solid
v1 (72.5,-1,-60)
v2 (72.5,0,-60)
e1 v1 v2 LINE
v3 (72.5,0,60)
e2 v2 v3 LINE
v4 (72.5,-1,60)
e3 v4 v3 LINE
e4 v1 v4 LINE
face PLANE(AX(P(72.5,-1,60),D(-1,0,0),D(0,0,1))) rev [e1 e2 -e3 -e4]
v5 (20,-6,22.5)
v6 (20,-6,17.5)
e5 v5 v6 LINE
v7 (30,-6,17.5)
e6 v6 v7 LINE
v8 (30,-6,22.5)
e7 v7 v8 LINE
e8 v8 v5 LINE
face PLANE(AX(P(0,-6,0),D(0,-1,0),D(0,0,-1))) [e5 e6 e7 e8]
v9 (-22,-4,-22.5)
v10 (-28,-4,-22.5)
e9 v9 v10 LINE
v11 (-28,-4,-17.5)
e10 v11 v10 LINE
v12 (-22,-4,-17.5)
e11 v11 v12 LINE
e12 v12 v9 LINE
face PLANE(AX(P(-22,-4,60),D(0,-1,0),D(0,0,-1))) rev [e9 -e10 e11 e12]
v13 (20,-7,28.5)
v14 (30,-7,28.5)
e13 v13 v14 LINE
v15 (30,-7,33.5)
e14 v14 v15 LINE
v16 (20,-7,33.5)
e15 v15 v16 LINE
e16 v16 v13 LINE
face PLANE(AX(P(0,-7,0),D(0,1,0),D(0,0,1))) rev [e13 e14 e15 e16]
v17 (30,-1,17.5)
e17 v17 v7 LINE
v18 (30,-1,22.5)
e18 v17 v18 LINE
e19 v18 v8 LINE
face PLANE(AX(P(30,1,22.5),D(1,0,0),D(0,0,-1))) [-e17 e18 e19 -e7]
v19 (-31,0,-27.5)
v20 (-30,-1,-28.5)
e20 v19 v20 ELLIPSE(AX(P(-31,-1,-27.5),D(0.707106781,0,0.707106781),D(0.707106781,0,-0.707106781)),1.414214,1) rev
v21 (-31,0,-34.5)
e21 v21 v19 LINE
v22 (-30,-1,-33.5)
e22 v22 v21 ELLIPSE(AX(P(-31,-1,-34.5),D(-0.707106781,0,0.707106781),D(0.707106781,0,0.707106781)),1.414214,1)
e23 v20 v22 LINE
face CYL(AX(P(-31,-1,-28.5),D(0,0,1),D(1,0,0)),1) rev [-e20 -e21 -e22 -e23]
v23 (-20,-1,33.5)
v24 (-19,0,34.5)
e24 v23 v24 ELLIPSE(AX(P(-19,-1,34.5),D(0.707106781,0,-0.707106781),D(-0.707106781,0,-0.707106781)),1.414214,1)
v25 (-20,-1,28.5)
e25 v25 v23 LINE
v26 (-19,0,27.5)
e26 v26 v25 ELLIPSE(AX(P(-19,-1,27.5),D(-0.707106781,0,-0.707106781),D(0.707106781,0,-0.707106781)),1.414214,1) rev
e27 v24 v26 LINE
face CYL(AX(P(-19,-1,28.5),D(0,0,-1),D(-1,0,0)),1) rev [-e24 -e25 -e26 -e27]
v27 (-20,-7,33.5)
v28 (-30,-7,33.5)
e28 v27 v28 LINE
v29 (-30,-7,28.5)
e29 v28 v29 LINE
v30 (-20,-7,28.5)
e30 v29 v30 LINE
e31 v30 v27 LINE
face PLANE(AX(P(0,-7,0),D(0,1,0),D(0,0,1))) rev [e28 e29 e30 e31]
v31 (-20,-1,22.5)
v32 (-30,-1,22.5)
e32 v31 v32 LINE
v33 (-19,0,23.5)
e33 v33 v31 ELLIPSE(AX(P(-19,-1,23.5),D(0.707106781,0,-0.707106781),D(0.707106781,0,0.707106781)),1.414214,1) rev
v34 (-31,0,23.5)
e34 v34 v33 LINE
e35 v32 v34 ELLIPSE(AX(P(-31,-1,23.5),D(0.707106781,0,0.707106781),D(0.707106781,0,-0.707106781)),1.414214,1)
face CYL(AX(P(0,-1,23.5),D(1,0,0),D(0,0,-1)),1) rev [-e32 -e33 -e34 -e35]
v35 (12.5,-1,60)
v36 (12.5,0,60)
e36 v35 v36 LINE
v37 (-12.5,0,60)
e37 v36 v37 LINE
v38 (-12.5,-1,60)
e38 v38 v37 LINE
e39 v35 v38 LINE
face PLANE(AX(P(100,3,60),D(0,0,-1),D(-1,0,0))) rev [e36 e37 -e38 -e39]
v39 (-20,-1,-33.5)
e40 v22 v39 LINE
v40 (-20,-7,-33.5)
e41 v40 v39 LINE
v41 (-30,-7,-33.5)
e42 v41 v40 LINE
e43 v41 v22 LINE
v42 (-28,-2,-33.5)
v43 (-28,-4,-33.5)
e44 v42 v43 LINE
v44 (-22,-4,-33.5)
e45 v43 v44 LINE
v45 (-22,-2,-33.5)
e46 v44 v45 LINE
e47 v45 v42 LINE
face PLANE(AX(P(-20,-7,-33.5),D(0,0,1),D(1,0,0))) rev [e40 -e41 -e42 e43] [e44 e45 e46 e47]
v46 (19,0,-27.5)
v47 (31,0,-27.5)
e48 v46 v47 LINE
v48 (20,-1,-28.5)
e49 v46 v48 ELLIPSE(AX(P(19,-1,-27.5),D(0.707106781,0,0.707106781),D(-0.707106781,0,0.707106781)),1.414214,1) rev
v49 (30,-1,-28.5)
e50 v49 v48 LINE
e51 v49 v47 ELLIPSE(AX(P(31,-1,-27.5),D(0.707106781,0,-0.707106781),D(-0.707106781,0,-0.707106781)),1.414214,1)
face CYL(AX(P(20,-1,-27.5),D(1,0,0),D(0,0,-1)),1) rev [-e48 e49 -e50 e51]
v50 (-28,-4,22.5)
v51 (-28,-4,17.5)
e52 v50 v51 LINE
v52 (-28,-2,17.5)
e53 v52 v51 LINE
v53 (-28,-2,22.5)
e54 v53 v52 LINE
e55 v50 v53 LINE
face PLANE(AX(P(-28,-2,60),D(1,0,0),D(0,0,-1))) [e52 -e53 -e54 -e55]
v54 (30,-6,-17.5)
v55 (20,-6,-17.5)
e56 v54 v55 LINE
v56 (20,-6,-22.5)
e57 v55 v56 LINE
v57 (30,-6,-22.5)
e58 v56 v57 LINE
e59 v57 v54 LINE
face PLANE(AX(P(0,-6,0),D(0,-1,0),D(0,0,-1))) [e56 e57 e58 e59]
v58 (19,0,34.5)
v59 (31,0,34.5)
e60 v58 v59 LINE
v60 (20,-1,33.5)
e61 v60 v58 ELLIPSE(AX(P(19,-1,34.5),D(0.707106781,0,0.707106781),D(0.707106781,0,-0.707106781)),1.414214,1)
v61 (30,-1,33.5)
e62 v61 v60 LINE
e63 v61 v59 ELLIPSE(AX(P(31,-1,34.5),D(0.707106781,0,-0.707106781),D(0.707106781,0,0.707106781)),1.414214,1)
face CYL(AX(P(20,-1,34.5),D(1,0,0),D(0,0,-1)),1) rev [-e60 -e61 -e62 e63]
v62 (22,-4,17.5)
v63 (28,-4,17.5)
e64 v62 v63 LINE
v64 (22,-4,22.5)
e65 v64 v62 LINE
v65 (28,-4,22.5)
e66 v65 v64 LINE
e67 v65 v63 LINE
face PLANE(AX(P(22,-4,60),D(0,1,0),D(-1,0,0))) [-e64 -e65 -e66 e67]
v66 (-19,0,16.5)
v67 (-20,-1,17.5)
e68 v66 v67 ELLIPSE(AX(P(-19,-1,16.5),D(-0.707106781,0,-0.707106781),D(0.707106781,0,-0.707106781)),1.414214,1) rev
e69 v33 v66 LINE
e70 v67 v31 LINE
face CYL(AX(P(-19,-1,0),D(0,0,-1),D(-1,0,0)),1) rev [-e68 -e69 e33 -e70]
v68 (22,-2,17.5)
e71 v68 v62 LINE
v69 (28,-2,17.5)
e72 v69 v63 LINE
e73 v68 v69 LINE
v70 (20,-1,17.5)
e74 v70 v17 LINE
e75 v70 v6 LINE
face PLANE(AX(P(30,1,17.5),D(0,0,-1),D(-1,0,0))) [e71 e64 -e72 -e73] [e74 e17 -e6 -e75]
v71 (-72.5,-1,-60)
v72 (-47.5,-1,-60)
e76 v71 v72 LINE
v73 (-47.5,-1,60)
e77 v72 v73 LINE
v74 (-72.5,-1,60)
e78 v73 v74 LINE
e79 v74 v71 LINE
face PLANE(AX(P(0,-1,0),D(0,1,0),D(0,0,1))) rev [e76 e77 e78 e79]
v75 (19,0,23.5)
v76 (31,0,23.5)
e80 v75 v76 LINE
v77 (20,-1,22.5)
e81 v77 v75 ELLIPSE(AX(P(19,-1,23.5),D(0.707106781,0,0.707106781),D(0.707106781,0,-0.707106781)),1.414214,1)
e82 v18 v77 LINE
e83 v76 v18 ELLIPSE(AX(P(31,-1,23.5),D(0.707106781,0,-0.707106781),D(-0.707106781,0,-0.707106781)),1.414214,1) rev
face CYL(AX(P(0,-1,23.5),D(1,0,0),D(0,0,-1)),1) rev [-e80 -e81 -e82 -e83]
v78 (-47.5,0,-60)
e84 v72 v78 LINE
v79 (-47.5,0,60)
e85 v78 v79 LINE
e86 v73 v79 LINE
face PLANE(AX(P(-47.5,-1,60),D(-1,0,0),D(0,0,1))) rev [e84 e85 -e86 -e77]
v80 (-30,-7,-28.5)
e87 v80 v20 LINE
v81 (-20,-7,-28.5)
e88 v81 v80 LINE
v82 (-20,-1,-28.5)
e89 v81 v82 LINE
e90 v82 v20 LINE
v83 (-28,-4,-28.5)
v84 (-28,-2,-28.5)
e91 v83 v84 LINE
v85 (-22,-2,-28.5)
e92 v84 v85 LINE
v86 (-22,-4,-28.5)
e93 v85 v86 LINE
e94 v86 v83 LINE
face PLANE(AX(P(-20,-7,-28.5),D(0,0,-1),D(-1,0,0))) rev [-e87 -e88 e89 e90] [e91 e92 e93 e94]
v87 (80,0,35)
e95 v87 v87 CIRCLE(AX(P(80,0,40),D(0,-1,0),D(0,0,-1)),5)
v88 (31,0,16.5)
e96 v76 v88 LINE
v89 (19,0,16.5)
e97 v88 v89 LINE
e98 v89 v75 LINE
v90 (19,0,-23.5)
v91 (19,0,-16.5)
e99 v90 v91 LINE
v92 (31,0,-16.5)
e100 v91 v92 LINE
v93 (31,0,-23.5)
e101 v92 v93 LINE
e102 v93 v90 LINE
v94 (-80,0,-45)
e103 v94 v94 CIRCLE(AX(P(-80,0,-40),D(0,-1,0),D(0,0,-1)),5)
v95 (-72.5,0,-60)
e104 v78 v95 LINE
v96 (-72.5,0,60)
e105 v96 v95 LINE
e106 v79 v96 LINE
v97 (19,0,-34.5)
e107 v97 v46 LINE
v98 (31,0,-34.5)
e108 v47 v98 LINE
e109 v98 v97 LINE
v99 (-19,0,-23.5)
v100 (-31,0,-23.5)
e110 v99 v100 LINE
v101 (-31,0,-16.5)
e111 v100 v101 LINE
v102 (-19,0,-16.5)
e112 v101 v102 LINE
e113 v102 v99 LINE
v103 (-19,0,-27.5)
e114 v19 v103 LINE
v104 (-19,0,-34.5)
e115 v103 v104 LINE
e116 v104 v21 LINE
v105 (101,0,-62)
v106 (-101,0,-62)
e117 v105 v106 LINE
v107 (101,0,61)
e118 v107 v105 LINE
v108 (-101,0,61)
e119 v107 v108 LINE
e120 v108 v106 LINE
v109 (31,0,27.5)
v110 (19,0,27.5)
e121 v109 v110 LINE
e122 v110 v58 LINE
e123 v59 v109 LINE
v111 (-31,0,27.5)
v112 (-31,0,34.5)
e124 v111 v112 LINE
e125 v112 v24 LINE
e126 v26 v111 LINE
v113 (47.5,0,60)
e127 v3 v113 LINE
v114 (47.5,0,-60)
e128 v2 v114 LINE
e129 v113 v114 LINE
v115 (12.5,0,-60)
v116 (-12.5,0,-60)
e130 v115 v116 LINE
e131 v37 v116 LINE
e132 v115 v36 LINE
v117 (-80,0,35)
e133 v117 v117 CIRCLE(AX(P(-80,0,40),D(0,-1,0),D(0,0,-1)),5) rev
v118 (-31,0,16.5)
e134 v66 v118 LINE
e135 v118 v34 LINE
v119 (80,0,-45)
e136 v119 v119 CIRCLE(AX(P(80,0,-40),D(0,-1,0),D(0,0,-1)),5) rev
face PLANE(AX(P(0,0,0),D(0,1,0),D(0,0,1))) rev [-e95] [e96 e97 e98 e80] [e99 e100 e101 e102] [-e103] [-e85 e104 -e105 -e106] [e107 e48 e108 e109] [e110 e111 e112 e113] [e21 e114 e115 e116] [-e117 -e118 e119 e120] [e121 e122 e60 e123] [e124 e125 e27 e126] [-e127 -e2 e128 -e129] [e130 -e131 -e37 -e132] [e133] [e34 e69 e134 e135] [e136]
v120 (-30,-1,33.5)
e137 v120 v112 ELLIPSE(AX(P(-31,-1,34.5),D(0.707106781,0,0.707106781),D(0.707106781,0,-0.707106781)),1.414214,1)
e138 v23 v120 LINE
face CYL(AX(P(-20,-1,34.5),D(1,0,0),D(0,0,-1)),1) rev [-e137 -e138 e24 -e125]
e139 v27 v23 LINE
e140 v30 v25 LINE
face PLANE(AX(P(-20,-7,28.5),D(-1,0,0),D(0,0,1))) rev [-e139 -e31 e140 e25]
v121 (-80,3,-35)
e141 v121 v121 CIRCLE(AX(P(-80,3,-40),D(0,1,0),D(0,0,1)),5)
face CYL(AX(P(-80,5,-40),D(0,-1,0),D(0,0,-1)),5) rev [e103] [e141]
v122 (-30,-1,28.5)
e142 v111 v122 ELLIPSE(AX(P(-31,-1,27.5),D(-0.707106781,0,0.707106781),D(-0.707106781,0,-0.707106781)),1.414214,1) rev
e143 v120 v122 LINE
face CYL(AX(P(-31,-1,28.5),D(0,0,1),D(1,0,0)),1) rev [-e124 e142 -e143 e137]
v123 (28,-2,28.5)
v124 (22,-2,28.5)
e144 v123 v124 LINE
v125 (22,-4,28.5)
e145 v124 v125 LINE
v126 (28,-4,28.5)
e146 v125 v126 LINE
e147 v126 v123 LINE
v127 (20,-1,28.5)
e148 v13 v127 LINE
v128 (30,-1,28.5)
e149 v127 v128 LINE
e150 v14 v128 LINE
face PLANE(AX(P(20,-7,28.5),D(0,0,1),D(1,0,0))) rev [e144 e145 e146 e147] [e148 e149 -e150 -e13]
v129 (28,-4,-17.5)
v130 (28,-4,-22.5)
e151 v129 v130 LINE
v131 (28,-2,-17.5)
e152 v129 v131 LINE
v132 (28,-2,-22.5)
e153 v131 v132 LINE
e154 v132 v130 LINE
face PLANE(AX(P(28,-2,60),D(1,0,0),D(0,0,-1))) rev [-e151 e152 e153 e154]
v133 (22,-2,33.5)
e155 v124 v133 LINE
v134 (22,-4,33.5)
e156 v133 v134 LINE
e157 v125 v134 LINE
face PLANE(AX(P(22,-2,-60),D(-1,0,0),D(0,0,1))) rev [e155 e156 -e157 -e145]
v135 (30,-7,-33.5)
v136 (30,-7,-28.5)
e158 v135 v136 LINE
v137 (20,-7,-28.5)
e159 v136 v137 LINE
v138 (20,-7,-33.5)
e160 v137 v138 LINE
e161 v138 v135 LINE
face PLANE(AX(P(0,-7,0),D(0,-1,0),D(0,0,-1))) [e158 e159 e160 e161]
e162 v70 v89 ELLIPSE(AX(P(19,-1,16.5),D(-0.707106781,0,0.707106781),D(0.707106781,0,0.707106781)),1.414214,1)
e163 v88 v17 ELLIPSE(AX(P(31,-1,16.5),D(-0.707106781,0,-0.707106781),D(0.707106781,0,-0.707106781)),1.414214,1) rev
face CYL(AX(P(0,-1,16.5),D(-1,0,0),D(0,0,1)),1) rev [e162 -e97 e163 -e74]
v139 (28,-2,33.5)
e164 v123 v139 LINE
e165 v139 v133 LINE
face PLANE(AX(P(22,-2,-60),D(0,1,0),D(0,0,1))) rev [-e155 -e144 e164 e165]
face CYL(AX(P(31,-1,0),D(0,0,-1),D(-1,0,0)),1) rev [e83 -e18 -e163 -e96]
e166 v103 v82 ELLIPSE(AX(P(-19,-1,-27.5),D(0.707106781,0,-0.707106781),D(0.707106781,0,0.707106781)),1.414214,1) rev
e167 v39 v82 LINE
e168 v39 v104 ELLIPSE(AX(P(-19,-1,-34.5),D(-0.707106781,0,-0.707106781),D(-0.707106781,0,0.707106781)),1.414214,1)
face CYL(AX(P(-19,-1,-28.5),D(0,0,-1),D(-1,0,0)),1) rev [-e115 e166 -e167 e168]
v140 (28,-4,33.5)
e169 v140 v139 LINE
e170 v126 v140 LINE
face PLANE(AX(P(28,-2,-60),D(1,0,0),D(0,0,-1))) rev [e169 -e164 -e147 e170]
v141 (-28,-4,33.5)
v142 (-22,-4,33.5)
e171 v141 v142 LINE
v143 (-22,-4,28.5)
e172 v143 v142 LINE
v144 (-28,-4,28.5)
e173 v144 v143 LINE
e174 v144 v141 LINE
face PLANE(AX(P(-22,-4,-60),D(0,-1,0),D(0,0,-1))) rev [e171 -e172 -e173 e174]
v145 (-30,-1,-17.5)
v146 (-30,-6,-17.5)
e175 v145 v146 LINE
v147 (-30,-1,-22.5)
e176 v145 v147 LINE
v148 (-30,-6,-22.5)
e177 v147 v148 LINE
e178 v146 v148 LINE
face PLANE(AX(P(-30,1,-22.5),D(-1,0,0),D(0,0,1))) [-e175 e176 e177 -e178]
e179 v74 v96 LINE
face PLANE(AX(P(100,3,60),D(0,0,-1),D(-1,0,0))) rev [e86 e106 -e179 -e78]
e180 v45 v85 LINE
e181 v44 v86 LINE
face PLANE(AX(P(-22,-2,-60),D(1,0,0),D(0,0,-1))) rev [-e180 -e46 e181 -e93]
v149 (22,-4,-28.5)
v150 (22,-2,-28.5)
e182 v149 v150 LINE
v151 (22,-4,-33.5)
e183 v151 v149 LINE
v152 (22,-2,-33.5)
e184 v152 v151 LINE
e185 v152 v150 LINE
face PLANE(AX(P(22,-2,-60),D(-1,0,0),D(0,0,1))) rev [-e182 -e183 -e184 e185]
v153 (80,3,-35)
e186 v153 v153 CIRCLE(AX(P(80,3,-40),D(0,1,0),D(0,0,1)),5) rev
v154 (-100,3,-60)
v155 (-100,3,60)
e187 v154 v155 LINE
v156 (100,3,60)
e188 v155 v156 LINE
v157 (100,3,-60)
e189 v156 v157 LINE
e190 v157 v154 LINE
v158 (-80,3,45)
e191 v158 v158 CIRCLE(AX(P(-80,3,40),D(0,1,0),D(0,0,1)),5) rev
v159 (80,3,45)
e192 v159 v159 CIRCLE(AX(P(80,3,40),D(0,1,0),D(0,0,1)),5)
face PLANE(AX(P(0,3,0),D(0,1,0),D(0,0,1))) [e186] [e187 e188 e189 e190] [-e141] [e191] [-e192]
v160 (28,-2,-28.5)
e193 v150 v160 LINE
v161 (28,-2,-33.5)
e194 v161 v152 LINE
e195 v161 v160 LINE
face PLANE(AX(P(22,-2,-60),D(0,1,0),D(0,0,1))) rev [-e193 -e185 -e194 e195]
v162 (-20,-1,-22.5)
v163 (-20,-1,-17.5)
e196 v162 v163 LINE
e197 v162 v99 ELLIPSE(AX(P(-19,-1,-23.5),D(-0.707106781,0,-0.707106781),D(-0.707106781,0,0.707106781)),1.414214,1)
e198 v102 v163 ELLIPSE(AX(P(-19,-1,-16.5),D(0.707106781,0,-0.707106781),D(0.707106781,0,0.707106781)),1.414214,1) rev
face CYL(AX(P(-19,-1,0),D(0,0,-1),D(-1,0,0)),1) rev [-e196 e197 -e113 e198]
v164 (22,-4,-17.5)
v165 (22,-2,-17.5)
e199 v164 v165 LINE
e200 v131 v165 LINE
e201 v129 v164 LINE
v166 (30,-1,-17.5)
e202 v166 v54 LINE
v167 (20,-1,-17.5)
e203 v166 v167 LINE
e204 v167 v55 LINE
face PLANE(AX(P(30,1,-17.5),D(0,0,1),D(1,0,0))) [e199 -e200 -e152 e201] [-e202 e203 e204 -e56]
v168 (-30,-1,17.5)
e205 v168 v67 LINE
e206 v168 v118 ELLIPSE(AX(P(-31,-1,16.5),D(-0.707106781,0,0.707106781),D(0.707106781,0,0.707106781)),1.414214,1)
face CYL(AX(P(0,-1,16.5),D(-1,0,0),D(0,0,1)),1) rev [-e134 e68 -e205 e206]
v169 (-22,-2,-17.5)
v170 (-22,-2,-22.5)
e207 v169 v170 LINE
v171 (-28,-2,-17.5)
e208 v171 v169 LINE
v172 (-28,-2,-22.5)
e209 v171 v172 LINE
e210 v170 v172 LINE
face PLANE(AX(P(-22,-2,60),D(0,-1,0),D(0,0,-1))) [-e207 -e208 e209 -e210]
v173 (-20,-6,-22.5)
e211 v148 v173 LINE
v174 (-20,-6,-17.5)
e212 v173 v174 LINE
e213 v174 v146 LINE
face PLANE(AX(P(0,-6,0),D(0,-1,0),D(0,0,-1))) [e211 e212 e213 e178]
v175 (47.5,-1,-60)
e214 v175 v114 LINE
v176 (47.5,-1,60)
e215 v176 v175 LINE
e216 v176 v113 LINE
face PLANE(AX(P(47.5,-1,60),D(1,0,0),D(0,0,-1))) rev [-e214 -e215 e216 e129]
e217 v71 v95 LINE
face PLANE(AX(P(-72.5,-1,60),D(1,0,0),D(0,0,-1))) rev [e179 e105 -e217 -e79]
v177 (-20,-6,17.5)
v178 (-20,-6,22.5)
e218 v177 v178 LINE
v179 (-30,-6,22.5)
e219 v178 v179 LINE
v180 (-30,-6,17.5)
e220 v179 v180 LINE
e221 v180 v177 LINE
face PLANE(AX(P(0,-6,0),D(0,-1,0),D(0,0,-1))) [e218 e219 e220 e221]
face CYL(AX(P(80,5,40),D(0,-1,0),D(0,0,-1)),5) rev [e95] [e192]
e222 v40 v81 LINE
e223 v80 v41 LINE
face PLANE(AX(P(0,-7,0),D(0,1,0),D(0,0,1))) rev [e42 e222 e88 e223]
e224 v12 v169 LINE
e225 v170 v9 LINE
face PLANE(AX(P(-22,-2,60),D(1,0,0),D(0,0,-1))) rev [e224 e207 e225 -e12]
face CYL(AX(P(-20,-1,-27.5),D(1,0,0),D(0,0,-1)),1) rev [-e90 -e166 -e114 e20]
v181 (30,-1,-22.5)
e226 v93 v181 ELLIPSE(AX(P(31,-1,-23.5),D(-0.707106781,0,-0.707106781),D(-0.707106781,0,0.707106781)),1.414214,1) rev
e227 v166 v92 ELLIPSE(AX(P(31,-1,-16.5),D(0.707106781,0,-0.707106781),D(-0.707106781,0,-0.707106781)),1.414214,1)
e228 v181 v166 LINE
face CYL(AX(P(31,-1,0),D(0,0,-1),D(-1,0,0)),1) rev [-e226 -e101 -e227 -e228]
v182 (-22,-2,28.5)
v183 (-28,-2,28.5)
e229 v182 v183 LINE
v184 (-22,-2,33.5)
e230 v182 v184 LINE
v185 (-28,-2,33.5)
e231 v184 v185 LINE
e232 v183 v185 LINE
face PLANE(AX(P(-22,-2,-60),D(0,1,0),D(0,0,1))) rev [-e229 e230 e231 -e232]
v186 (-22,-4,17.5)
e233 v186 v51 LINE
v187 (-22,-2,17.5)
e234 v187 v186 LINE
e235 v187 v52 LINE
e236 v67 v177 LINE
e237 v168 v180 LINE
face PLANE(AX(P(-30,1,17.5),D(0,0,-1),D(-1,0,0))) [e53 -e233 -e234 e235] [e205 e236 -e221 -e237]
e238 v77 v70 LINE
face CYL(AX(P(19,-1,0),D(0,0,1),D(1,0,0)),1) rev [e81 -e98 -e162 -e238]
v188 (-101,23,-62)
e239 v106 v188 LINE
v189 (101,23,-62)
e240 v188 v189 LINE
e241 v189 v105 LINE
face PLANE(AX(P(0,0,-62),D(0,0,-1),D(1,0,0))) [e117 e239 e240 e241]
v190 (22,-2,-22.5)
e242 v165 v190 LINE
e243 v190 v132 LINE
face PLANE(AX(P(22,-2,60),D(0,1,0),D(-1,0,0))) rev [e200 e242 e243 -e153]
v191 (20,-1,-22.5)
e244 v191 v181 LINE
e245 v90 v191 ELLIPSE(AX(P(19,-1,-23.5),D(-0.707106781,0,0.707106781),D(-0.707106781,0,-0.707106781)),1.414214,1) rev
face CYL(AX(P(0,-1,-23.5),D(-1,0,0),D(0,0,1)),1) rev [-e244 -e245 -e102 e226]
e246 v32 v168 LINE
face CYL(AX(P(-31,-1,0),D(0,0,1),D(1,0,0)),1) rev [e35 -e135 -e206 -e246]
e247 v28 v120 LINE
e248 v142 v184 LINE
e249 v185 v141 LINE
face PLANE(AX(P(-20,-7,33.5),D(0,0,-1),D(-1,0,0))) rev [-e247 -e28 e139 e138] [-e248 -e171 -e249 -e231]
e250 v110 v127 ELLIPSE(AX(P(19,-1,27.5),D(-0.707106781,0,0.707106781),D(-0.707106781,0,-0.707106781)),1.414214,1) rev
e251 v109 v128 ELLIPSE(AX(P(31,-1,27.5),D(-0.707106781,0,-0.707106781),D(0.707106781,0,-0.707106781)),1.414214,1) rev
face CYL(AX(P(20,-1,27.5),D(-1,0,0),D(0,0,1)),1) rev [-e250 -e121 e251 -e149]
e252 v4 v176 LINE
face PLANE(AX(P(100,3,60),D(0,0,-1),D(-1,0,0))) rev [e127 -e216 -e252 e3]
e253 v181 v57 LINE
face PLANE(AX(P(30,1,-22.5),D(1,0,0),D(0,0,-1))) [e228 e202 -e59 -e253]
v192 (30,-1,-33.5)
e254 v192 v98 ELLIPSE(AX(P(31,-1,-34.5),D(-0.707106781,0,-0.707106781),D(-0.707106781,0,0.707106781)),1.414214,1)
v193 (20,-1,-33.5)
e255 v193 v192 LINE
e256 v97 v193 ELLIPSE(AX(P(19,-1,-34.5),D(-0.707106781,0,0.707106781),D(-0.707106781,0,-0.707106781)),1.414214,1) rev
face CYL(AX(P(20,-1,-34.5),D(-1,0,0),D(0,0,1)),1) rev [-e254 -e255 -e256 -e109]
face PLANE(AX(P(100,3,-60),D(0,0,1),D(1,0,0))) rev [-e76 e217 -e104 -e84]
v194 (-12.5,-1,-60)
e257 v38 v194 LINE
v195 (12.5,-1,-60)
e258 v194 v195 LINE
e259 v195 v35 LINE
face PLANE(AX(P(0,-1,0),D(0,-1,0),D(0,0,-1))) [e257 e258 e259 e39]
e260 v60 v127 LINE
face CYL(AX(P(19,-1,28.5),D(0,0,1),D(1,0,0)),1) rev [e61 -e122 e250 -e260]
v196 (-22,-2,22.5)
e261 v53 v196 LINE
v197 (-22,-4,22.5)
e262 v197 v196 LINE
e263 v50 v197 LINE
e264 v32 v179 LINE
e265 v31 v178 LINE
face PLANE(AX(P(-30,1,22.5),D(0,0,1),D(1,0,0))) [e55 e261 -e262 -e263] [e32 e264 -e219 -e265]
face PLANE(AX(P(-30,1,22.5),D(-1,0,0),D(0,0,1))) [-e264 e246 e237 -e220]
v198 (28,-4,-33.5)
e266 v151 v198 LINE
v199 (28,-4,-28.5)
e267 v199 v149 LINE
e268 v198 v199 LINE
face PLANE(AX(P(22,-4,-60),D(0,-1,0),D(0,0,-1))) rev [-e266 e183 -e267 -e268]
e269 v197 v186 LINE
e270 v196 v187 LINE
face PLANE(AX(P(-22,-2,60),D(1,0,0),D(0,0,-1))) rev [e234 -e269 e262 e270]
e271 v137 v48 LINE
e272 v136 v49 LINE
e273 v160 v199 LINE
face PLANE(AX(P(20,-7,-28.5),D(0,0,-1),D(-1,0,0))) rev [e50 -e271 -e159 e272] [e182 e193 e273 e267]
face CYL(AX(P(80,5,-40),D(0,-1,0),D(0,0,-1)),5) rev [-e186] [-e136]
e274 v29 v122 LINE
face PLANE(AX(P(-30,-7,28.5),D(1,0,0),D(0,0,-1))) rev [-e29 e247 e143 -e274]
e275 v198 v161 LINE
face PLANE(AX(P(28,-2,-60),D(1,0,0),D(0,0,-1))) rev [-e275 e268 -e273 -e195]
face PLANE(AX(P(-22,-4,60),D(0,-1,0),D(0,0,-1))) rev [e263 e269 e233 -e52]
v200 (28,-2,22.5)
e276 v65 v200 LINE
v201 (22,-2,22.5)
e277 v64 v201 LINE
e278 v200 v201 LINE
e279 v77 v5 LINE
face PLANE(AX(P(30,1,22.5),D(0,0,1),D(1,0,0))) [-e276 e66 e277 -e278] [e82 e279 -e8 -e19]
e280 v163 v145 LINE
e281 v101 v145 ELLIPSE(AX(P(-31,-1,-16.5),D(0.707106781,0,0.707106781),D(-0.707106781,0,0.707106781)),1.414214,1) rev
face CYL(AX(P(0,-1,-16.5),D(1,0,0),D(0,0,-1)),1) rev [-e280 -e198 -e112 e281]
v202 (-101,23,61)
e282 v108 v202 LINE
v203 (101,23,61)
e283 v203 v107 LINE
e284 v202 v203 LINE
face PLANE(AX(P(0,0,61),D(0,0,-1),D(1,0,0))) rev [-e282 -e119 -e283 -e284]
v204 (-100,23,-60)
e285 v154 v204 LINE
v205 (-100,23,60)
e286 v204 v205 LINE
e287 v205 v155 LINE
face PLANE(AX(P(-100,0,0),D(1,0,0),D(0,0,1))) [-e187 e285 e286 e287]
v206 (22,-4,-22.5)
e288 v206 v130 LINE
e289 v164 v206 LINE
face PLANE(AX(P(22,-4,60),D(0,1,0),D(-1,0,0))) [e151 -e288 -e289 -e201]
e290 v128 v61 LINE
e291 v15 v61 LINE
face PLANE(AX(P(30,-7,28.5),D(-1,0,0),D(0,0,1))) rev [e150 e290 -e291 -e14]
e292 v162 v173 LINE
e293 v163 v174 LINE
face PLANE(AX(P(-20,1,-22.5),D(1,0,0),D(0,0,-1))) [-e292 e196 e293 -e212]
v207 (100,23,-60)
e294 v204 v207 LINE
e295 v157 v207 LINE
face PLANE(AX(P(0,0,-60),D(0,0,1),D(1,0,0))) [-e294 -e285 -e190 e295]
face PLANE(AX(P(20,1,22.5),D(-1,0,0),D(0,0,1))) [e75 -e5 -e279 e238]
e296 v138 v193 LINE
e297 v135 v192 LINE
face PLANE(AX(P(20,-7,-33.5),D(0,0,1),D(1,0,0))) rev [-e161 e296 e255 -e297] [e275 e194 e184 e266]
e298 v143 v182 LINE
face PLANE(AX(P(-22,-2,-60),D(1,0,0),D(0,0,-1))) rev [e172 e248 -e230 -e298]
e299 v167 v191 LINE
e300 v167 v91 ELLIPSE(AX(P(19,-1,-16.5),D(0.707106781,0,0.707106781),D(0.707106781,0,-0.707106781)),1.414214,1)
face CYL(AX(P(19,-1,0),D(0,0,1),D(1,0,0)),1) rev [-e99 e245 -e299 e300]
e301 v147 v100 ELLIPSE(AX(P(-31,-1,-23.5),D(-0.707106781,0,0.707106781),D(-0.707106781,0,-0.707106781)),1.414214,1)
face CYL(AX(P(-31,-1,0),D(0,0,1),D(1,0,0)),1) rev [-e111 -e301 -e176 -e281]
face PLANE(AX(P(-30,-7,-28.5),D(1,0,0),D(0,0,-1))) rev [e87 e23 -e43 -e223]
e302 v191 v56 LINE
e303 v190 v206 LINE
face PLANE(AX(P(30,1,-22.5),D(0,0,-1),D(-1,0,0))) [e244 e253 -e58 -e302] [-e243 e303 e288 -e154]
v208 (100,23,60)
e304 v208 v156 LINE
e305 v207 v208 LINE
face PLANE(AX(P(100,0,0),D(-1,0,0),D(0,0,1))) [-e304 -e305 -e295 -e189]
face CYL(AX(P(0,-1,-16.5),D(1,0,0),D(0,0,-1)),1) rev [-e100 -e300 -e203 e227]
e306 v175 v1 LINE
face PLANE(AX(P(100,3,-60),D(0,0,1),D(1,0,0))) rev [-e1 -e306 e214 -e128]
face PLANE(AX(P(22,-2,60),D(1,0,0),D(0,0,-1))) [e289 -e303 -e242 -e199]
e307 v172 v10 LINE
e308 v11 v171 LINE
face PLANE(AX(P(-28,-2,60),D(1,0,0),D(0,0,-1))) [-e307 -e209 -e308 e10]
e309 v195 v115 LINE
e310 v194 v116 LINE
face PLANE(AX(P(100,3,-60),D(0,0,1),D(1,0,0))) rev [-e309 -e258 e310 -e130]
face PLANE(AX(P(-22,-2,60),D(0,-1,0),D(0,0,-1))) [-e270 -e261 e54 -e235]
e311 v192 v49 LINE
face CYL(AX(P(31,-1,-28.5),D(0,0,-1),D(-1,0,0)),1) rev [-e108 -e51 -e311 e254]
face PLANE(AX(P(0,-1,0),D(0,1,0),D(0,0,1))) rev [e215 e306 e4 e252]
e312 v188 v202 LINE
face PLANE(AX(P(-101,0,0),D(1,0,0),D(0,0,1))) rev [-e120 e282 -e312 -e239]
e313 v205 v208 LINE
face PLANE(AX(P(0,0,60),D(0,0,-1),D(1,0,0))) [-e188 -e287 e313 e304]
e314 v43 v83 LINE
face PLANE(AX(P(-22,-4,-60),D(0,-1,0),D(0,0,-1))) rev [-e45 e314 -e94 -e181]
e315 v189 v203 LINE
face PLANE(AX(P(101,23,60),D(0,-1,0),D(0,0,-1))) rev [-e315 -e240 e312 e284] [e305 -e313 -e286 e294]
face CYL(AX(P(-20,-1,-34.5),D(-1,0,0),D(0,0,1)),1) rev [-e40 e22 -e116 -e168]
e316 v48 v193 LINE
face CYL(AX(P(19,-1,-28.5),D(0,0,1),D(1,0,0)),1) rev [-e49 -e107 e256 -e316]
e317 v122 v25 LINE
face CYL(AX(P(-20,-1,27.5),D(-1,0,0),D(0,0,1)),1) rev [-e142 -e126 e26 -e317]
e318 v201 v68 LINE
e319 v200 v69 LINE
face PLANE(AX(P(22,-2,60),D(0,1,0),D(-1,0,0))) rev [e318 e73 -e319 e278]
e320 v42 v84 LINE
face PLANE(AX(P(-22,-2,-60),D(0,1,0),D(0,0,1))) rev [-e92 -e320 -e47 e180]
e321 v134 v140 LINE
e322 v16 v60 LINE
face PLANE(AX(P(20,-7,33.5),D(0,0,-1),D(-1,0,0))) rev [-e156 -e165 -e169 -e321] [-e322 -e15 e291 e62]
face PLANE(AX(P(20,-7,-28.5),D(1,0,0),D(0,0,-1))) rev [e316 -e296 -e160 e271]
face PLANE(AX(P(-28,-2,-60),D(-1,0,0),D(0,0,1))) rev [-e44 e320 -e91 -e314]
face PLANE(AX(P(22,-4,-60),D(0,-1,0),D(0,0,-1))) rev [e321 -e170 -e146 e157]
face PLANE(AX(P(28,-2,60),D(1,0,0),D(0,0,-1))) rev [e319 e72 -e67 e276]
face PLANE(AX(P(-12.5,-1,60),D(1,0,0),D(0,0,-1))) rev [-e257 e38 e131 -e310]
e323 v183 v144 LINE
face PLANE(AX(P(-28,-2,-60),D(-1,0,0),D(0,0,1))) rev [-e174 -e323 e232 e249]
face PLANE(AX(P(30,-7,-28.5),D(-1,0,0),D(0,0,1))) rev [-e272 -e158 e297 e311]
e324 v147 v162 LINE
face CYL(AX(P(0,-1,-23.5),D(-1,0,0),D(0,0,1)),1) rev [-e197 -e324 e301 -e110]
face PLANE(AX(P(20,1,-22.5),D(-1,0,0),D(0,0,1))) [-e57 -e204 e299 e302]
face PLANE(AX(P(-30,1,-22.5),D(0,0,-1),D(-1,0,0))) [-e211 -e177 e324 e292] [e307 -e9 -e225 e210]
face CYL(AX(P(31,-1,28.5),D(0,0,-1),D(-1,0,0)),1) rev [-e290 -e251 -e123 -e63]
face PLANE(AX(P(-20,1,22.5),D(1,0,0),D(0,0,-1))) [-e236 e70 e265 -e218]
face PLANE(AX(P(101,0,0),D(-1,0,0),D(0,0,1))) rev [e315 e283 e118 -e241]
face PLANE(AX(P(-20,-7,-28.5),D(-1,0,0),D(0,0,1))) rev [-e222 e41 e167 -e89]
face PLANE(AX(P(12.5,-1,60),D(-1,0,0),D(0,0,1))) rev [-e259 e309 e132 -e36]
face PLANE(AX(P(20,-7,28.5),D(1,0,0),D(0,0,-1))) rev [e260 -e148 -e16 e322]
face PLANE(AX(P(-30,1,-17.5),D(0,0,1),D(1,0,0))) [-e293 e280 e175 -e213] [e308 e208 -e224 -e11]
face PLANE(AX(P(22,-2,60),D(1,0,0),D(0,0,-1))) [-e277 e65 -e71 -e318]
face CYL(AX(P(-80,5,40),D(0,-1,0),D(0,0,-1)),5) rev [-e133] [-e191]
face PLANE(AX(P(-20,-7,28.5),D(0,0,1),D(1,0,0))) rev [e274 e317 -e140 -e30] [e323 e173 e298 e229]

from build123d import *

# Parameters (mm, degrees)
SKETCH1_W             = 200
SKETCH1_H             = 120
BOSS_EXTRUDE3_DEPTH   = 3
SKETCH7_W             = 25
SKETCH7_H             = 120
BOSS_EXTRUDE4_DEPTH   = 1
SKETCH8_W             = 10
SKETCH8_H             = 5
BOSS_EXTRUDE5_DEPTH   = 2
BOSS_EXTRUDE5_2_DEPTH = 2
BOSS_EXTRUDE5_3_DEPTH = 2
BOSS_EXTRUDE5_4_DEPTH = 2
SKETCH10_W            = 10
SKETCH10_H            = 5
BOSS_EXTRUDE6_DEPTH   = 5
SKETCH11_R            = 5
CUT_EXTRUDE4_DEPTH    = 5
SKETCH13_W            = 6
SKETCH13_H            = 2
CUT_EXTRUDE5_DEPTH    = 130.77769454
FILLET3_R             = 1
FILLET4_R             = 1
SKETCH15_W            = 10
SKETCH15_H            = 5
BOSS_EXTRUDE9_DEPTH   = 7
SKETCH16_W            = 6
SKETCH16_H            = 2
CUT_EXTRUDE8_DEPTH    = 138.081180328
FILLET5_R             = 1
SKETCH18_W            = 120
SKETCH18_H            = 23
BOSS_EXTRUDE10_DEPTH  = 1
SKETCH19_W            = 202
SKETCH19_H            = 23
BOSS_EXTRUDE11_DEPTH  = 1
MIRROR2_START         = -62
MIRROR2_OUTLINE_W     = 202
MIRROR2_OUTLINE_H     = 23
MIRROR2_DEPTH         = 1
MIRROR2_START_2       = 60
MIRROR2_2_OUTLINE_W   = 202
MIRROR2_2_OUTLINE_H   = 23
MIRROR2_2_DEPTH       = 1


# Read off the part's stored shape, not the designer's step: Mirror2
with BuildPart() as part:
    # Sketch1 → Boss-Extrude3 (new body)
    with BuildSketch(Plane(origin=(0, 0, 0), x_dir=(1, 0, 0), z_dir=(0, 1, 0))):
        Rectangle(SKETCH1_W, SKETCH1_H)
    extrude(amount=BOSS_EXTRUDE3_DEPTH)

    # Sketch7 → Boss-Extrude4 (add)
    with BuildSketch(Plane(origin=(0, 0, 0), x_dir=(-1, 0, 0), z_dir=(0, -1, 0))):
        Rectangle(SKETCH7_W, SKETCH7_H)
        with Locations((60, 0)):
            Rectangle(SKETCH7_W, SKETCH7_H)
        with Locations((-60, 0)):
            Rectangle(SKETCH7_W, SKETCH7_H)
    extrude(amount=BOSS_EXTRUDE4_DEPTH)



with BuildPart() as body_2:
    # Sketch8 → Boss-Extrude5 (new body)
    with BuildSketch(Plane(origin=(0, -1, 0), x_dir=(-1, 0, 0), z_dir=(0, -1, 0))):
        with Locations((25, -20)):
            Rectangle(SKETCH8_W, SKETCH8_H)
    extrude(amount=-BOSS_EXTRUDE5_DEPTH)


with BuildPart() as body_3:
    # Sketch8 → Boss-Extrude5 2 (new body)
    with BuildSketch(Plane(origin=(0, -1, 0), x_dir=(-1, 0, 0), z_dir=(0, -1, 0))):
        with Locations((-25, -20)):
            Rectangle(SKETCH8_W, SKETCH8_H)
    extrude(amount=-BOSS_EXTRUDE5_2_DEPTH)


with BuildPart() as body_4:
    # Sketch8 → Boss-Extrude5 3 (new body)
    with BuildSketch(Plane(origin=(0, -1, 0), x_dir=(-1, 0, 0), z_dir=(0, -1, 0))):
        with Locations((-25, 20)):
            Rectangle(SKETCH8_W, SKETCH8_H)
    extrude(amount=-BOSS_EXTRUDE5_3_DEPTH)


with BuildPart() as body_5:
    # Sketch8 → Boss-Extrude5 4 (new body)
    with BuildSketch(Plane(origin=(0, -1, 0), x_dir=(-1, 0, 0), z_dir=(0, -1, 0))):
        with Locations((25, 20)):
            Rectangle(SKETCH8_W, SKETCH8_H)
    extrude(amount=-BOSS_EXTRUDE5_4_DEPTH)


with BuildPart() as part_1:
    add(part.part)

    add(body_2.part)  # Boss-Extrude6 merges body 2

    add(body_3.part)  # Boss-Extrude6 merges body 3

    add(body_4.part)  # Boss-Extrude6 merges body 4

    add(body_5.part)  # Boss-Extrude6 merges body 5
    # Sketch10 → Boss-Extrude6 (add)
    with BuildSketch(Plane(origin=(0, -1, 0), x_dir=(-1, 0, 0), z_dir=(0, -1, 0))):
        with Locations((25, -20)):
            Rectangle(SKETCH10_W, SKETCH10_H)
        with Locations((25, 20)):
            Rectangle(SKETCH10_W, SKETCH10_H)
        with Locations((-25, 20)):
            Rectangle(SKETCH10_W, SKETCH10_H)
        with Locations((-25, -20)):
            Rectangle(SKETCH10_W, SKETCH10_H)
    extrude(amount=BOSS_EXTRUDE6_DEPTH)

    # Sketch11 → Cut-Extrude4 (cut)
    with BuildSketch(Plane(origin=(0, 0, 0), x_dir=(-1, 0, 0), z_dir=(0, -1, 0))):
        with Locations(Location((-80, -40, 0), (0, 0, 90))):
            Circle(SKETCH11_R)
        with Locations(Location((-80, 40, 0), (0, 0, 90))):
            Circle(SKETCH11_R)
        with Locations(Location((80, 40, 0), (0, 0, 90))):
            Circle(SKETCH11_R)
        with Locations(Location((80, -40, 0), (0, 0, 90))):
            Circle(SKETCH11_R)
    extrude(amount=-CUT_EXTRUDE4_DEPTH, mode=Mode.SUBTRACT)

    # Sketch13 → Cut-Extrude5 (cut, through all)
    with BuildSketch(Plane(origin=(0, 0, -22.5), x_dir=(-1, 0, 0), z_dir=(0, 0, -1))):
        with Locations((25, -3)):
            Rectangle(SKETCH13_W, SKETCH13_H)
        with Locations((-25, -3)):
            Rectangle(SKETCH13_W, SKETCH13_H)
    extrude(amount=-CUT_EXTRUDE5_DEPTH, mode=Mode.SUBTRACT)

    # Fillet3
    fillet3_edges = [part_1.edges().sort_by_distance(p)[0] for p in [
        (30, 0, -20),
        (25, 0, -17.5),
        (20, 0, -20),
        (25, 0, -22.5),
    ]]
    fillet(fillet3_edges, radius=FILLET3_R)

    # Fillet4
    fillet4_edges = [part_1.edges().sort_by_distance(p)[0] for p in [
        (-25, 0, -22.5),
        (-20, 0, -20),
        (-25, 0, -17.5),
        (-30, 0, -20),
        (-25, 0, 22.5),
        (-30, 0, 20),
        (-25, 0, 17.5),
        (-20, 0, 20),
        (25, 0, 22.5),
        (20, 0, 20),
        (25, 0, 17.5),
        (30, 0, 20),
    ]]
    fillet(fillet4_edges, radius=FILLET4_R)

    # Sketch15 → Boss-Extrude9 (add)
    with BuildSketch(Plane(origin=(0, 0, 0), x_dir=(-1, 0, 0), z_dir=(0, -1, 0))):
        with Locations((-25, 31)):
            Rectangle(SKETCH15_W, SKETCH15_H)
        with Locations((25, 31)):
            Rectangle(SKETCH15_W, SKETCH15_H)
        with Locations((25, -31)):
            Rectangle(SKETCH15_W, SKETCH15_H)
        with Locations((-25, -31)):
            Rectangle(SKETCH15_W, SKETCH15_H)
    extrude(amount=BOSS_EXTRUDE9_DEPTH)

    # Sketch16 → Cut-Extrude8 (cut, through all)
    with BuildSketch(Plane.XY.offset(33.5)):
        with Locations((25, -3)):
            Rectangle(SKETCH16_W, SKETCH16_H)
        with Locations((-25, -3)):
            Rectangle(SKETCH16_W, SKETCH16_H)
    extrude(amount=-CUT_EXTRUDE8_DEPTH, mode=Mode.SUBTRACT)

    # Fillet5
    fillet5_edges = [part_1.edges().sort_by_distance(p)[0] for p in [
        (30, 0, -31),
        (25, 0, -28.5),
        (20, 0, -31),
        (25, 0, -33.5),
        (-20, 0, -31),
        (-25, 0, -28.5),
        (-30, 0, -31),
        (-25, 0, -33.5),
        (-25, 0, 28.5),
        (-20, 0, 31),
        (-25, 0, 33.5),
        (-30, 0, 31),
        (20, 0, 31),
        (25, 0, 28.5),
        (30, 0, 31),
        (25, 0, 33.5),
    ]]
    fillet(fillet5_edges, radius=FILLET5_R)

    # Sketch18 → Boss-Extrude10 (add)
    with BuildSketch(Plane(origin=(100, 0, 0), x_dir=(0, 0, -1), z_dir=(1, 0, 0))):
        with Locations((0, 11.5)):
            Rectangle(SKETCH18_W, SKETCH18_H)
    boss_extrude10 = extrude(amount=BOSS_EXTRUDE10_DEPTH)

    # Mirror1: Boss-Extrude10 across plane
    add(boss_extrude10.mirror(Plane(origin=(0, 0, 0), x_dir=(0, 0, 1), z_dir=(1, 0, 0))))

    # Sketch19 → Boss-Extrude11 (add)
    with BuildSketch(Plane(origin=(0, 0, -60), x_dir=(-1, 0, 0), z_dir=(0, 0, -1))):
        with Locations((0, 11.5)):
            Rectangle(SKETCH19_W, SKETCH19_H)
    extrude(amount=BOSS_EXTRUDE11_DEPTH)

    # Mirror2 outline → Mirror2 (add)
    with BuildSketch(Plane.XY.offset(MIRROR2_START)):
        with Locations((0, 11.5)):
            Rectangle(MIRROR2_OUTLINE_W, MIRROR2_OUTLINE_H)
    extrude(amount=MIRROR2_DEPTH)

    # Mirror2 2 outline → Mirror2 2 (add)
    with BuildSketch(Plane.XY.offset(MIRROR2_START_2)):
        with Locations((0, 11.5)):
            Rectangle(MIRROR2_2_OUTLINE_W, MIRROR2_2_OUTLINE_H)
    extrude(amount=MIRROR2_2_DEPTH)


solid = part_1.part
